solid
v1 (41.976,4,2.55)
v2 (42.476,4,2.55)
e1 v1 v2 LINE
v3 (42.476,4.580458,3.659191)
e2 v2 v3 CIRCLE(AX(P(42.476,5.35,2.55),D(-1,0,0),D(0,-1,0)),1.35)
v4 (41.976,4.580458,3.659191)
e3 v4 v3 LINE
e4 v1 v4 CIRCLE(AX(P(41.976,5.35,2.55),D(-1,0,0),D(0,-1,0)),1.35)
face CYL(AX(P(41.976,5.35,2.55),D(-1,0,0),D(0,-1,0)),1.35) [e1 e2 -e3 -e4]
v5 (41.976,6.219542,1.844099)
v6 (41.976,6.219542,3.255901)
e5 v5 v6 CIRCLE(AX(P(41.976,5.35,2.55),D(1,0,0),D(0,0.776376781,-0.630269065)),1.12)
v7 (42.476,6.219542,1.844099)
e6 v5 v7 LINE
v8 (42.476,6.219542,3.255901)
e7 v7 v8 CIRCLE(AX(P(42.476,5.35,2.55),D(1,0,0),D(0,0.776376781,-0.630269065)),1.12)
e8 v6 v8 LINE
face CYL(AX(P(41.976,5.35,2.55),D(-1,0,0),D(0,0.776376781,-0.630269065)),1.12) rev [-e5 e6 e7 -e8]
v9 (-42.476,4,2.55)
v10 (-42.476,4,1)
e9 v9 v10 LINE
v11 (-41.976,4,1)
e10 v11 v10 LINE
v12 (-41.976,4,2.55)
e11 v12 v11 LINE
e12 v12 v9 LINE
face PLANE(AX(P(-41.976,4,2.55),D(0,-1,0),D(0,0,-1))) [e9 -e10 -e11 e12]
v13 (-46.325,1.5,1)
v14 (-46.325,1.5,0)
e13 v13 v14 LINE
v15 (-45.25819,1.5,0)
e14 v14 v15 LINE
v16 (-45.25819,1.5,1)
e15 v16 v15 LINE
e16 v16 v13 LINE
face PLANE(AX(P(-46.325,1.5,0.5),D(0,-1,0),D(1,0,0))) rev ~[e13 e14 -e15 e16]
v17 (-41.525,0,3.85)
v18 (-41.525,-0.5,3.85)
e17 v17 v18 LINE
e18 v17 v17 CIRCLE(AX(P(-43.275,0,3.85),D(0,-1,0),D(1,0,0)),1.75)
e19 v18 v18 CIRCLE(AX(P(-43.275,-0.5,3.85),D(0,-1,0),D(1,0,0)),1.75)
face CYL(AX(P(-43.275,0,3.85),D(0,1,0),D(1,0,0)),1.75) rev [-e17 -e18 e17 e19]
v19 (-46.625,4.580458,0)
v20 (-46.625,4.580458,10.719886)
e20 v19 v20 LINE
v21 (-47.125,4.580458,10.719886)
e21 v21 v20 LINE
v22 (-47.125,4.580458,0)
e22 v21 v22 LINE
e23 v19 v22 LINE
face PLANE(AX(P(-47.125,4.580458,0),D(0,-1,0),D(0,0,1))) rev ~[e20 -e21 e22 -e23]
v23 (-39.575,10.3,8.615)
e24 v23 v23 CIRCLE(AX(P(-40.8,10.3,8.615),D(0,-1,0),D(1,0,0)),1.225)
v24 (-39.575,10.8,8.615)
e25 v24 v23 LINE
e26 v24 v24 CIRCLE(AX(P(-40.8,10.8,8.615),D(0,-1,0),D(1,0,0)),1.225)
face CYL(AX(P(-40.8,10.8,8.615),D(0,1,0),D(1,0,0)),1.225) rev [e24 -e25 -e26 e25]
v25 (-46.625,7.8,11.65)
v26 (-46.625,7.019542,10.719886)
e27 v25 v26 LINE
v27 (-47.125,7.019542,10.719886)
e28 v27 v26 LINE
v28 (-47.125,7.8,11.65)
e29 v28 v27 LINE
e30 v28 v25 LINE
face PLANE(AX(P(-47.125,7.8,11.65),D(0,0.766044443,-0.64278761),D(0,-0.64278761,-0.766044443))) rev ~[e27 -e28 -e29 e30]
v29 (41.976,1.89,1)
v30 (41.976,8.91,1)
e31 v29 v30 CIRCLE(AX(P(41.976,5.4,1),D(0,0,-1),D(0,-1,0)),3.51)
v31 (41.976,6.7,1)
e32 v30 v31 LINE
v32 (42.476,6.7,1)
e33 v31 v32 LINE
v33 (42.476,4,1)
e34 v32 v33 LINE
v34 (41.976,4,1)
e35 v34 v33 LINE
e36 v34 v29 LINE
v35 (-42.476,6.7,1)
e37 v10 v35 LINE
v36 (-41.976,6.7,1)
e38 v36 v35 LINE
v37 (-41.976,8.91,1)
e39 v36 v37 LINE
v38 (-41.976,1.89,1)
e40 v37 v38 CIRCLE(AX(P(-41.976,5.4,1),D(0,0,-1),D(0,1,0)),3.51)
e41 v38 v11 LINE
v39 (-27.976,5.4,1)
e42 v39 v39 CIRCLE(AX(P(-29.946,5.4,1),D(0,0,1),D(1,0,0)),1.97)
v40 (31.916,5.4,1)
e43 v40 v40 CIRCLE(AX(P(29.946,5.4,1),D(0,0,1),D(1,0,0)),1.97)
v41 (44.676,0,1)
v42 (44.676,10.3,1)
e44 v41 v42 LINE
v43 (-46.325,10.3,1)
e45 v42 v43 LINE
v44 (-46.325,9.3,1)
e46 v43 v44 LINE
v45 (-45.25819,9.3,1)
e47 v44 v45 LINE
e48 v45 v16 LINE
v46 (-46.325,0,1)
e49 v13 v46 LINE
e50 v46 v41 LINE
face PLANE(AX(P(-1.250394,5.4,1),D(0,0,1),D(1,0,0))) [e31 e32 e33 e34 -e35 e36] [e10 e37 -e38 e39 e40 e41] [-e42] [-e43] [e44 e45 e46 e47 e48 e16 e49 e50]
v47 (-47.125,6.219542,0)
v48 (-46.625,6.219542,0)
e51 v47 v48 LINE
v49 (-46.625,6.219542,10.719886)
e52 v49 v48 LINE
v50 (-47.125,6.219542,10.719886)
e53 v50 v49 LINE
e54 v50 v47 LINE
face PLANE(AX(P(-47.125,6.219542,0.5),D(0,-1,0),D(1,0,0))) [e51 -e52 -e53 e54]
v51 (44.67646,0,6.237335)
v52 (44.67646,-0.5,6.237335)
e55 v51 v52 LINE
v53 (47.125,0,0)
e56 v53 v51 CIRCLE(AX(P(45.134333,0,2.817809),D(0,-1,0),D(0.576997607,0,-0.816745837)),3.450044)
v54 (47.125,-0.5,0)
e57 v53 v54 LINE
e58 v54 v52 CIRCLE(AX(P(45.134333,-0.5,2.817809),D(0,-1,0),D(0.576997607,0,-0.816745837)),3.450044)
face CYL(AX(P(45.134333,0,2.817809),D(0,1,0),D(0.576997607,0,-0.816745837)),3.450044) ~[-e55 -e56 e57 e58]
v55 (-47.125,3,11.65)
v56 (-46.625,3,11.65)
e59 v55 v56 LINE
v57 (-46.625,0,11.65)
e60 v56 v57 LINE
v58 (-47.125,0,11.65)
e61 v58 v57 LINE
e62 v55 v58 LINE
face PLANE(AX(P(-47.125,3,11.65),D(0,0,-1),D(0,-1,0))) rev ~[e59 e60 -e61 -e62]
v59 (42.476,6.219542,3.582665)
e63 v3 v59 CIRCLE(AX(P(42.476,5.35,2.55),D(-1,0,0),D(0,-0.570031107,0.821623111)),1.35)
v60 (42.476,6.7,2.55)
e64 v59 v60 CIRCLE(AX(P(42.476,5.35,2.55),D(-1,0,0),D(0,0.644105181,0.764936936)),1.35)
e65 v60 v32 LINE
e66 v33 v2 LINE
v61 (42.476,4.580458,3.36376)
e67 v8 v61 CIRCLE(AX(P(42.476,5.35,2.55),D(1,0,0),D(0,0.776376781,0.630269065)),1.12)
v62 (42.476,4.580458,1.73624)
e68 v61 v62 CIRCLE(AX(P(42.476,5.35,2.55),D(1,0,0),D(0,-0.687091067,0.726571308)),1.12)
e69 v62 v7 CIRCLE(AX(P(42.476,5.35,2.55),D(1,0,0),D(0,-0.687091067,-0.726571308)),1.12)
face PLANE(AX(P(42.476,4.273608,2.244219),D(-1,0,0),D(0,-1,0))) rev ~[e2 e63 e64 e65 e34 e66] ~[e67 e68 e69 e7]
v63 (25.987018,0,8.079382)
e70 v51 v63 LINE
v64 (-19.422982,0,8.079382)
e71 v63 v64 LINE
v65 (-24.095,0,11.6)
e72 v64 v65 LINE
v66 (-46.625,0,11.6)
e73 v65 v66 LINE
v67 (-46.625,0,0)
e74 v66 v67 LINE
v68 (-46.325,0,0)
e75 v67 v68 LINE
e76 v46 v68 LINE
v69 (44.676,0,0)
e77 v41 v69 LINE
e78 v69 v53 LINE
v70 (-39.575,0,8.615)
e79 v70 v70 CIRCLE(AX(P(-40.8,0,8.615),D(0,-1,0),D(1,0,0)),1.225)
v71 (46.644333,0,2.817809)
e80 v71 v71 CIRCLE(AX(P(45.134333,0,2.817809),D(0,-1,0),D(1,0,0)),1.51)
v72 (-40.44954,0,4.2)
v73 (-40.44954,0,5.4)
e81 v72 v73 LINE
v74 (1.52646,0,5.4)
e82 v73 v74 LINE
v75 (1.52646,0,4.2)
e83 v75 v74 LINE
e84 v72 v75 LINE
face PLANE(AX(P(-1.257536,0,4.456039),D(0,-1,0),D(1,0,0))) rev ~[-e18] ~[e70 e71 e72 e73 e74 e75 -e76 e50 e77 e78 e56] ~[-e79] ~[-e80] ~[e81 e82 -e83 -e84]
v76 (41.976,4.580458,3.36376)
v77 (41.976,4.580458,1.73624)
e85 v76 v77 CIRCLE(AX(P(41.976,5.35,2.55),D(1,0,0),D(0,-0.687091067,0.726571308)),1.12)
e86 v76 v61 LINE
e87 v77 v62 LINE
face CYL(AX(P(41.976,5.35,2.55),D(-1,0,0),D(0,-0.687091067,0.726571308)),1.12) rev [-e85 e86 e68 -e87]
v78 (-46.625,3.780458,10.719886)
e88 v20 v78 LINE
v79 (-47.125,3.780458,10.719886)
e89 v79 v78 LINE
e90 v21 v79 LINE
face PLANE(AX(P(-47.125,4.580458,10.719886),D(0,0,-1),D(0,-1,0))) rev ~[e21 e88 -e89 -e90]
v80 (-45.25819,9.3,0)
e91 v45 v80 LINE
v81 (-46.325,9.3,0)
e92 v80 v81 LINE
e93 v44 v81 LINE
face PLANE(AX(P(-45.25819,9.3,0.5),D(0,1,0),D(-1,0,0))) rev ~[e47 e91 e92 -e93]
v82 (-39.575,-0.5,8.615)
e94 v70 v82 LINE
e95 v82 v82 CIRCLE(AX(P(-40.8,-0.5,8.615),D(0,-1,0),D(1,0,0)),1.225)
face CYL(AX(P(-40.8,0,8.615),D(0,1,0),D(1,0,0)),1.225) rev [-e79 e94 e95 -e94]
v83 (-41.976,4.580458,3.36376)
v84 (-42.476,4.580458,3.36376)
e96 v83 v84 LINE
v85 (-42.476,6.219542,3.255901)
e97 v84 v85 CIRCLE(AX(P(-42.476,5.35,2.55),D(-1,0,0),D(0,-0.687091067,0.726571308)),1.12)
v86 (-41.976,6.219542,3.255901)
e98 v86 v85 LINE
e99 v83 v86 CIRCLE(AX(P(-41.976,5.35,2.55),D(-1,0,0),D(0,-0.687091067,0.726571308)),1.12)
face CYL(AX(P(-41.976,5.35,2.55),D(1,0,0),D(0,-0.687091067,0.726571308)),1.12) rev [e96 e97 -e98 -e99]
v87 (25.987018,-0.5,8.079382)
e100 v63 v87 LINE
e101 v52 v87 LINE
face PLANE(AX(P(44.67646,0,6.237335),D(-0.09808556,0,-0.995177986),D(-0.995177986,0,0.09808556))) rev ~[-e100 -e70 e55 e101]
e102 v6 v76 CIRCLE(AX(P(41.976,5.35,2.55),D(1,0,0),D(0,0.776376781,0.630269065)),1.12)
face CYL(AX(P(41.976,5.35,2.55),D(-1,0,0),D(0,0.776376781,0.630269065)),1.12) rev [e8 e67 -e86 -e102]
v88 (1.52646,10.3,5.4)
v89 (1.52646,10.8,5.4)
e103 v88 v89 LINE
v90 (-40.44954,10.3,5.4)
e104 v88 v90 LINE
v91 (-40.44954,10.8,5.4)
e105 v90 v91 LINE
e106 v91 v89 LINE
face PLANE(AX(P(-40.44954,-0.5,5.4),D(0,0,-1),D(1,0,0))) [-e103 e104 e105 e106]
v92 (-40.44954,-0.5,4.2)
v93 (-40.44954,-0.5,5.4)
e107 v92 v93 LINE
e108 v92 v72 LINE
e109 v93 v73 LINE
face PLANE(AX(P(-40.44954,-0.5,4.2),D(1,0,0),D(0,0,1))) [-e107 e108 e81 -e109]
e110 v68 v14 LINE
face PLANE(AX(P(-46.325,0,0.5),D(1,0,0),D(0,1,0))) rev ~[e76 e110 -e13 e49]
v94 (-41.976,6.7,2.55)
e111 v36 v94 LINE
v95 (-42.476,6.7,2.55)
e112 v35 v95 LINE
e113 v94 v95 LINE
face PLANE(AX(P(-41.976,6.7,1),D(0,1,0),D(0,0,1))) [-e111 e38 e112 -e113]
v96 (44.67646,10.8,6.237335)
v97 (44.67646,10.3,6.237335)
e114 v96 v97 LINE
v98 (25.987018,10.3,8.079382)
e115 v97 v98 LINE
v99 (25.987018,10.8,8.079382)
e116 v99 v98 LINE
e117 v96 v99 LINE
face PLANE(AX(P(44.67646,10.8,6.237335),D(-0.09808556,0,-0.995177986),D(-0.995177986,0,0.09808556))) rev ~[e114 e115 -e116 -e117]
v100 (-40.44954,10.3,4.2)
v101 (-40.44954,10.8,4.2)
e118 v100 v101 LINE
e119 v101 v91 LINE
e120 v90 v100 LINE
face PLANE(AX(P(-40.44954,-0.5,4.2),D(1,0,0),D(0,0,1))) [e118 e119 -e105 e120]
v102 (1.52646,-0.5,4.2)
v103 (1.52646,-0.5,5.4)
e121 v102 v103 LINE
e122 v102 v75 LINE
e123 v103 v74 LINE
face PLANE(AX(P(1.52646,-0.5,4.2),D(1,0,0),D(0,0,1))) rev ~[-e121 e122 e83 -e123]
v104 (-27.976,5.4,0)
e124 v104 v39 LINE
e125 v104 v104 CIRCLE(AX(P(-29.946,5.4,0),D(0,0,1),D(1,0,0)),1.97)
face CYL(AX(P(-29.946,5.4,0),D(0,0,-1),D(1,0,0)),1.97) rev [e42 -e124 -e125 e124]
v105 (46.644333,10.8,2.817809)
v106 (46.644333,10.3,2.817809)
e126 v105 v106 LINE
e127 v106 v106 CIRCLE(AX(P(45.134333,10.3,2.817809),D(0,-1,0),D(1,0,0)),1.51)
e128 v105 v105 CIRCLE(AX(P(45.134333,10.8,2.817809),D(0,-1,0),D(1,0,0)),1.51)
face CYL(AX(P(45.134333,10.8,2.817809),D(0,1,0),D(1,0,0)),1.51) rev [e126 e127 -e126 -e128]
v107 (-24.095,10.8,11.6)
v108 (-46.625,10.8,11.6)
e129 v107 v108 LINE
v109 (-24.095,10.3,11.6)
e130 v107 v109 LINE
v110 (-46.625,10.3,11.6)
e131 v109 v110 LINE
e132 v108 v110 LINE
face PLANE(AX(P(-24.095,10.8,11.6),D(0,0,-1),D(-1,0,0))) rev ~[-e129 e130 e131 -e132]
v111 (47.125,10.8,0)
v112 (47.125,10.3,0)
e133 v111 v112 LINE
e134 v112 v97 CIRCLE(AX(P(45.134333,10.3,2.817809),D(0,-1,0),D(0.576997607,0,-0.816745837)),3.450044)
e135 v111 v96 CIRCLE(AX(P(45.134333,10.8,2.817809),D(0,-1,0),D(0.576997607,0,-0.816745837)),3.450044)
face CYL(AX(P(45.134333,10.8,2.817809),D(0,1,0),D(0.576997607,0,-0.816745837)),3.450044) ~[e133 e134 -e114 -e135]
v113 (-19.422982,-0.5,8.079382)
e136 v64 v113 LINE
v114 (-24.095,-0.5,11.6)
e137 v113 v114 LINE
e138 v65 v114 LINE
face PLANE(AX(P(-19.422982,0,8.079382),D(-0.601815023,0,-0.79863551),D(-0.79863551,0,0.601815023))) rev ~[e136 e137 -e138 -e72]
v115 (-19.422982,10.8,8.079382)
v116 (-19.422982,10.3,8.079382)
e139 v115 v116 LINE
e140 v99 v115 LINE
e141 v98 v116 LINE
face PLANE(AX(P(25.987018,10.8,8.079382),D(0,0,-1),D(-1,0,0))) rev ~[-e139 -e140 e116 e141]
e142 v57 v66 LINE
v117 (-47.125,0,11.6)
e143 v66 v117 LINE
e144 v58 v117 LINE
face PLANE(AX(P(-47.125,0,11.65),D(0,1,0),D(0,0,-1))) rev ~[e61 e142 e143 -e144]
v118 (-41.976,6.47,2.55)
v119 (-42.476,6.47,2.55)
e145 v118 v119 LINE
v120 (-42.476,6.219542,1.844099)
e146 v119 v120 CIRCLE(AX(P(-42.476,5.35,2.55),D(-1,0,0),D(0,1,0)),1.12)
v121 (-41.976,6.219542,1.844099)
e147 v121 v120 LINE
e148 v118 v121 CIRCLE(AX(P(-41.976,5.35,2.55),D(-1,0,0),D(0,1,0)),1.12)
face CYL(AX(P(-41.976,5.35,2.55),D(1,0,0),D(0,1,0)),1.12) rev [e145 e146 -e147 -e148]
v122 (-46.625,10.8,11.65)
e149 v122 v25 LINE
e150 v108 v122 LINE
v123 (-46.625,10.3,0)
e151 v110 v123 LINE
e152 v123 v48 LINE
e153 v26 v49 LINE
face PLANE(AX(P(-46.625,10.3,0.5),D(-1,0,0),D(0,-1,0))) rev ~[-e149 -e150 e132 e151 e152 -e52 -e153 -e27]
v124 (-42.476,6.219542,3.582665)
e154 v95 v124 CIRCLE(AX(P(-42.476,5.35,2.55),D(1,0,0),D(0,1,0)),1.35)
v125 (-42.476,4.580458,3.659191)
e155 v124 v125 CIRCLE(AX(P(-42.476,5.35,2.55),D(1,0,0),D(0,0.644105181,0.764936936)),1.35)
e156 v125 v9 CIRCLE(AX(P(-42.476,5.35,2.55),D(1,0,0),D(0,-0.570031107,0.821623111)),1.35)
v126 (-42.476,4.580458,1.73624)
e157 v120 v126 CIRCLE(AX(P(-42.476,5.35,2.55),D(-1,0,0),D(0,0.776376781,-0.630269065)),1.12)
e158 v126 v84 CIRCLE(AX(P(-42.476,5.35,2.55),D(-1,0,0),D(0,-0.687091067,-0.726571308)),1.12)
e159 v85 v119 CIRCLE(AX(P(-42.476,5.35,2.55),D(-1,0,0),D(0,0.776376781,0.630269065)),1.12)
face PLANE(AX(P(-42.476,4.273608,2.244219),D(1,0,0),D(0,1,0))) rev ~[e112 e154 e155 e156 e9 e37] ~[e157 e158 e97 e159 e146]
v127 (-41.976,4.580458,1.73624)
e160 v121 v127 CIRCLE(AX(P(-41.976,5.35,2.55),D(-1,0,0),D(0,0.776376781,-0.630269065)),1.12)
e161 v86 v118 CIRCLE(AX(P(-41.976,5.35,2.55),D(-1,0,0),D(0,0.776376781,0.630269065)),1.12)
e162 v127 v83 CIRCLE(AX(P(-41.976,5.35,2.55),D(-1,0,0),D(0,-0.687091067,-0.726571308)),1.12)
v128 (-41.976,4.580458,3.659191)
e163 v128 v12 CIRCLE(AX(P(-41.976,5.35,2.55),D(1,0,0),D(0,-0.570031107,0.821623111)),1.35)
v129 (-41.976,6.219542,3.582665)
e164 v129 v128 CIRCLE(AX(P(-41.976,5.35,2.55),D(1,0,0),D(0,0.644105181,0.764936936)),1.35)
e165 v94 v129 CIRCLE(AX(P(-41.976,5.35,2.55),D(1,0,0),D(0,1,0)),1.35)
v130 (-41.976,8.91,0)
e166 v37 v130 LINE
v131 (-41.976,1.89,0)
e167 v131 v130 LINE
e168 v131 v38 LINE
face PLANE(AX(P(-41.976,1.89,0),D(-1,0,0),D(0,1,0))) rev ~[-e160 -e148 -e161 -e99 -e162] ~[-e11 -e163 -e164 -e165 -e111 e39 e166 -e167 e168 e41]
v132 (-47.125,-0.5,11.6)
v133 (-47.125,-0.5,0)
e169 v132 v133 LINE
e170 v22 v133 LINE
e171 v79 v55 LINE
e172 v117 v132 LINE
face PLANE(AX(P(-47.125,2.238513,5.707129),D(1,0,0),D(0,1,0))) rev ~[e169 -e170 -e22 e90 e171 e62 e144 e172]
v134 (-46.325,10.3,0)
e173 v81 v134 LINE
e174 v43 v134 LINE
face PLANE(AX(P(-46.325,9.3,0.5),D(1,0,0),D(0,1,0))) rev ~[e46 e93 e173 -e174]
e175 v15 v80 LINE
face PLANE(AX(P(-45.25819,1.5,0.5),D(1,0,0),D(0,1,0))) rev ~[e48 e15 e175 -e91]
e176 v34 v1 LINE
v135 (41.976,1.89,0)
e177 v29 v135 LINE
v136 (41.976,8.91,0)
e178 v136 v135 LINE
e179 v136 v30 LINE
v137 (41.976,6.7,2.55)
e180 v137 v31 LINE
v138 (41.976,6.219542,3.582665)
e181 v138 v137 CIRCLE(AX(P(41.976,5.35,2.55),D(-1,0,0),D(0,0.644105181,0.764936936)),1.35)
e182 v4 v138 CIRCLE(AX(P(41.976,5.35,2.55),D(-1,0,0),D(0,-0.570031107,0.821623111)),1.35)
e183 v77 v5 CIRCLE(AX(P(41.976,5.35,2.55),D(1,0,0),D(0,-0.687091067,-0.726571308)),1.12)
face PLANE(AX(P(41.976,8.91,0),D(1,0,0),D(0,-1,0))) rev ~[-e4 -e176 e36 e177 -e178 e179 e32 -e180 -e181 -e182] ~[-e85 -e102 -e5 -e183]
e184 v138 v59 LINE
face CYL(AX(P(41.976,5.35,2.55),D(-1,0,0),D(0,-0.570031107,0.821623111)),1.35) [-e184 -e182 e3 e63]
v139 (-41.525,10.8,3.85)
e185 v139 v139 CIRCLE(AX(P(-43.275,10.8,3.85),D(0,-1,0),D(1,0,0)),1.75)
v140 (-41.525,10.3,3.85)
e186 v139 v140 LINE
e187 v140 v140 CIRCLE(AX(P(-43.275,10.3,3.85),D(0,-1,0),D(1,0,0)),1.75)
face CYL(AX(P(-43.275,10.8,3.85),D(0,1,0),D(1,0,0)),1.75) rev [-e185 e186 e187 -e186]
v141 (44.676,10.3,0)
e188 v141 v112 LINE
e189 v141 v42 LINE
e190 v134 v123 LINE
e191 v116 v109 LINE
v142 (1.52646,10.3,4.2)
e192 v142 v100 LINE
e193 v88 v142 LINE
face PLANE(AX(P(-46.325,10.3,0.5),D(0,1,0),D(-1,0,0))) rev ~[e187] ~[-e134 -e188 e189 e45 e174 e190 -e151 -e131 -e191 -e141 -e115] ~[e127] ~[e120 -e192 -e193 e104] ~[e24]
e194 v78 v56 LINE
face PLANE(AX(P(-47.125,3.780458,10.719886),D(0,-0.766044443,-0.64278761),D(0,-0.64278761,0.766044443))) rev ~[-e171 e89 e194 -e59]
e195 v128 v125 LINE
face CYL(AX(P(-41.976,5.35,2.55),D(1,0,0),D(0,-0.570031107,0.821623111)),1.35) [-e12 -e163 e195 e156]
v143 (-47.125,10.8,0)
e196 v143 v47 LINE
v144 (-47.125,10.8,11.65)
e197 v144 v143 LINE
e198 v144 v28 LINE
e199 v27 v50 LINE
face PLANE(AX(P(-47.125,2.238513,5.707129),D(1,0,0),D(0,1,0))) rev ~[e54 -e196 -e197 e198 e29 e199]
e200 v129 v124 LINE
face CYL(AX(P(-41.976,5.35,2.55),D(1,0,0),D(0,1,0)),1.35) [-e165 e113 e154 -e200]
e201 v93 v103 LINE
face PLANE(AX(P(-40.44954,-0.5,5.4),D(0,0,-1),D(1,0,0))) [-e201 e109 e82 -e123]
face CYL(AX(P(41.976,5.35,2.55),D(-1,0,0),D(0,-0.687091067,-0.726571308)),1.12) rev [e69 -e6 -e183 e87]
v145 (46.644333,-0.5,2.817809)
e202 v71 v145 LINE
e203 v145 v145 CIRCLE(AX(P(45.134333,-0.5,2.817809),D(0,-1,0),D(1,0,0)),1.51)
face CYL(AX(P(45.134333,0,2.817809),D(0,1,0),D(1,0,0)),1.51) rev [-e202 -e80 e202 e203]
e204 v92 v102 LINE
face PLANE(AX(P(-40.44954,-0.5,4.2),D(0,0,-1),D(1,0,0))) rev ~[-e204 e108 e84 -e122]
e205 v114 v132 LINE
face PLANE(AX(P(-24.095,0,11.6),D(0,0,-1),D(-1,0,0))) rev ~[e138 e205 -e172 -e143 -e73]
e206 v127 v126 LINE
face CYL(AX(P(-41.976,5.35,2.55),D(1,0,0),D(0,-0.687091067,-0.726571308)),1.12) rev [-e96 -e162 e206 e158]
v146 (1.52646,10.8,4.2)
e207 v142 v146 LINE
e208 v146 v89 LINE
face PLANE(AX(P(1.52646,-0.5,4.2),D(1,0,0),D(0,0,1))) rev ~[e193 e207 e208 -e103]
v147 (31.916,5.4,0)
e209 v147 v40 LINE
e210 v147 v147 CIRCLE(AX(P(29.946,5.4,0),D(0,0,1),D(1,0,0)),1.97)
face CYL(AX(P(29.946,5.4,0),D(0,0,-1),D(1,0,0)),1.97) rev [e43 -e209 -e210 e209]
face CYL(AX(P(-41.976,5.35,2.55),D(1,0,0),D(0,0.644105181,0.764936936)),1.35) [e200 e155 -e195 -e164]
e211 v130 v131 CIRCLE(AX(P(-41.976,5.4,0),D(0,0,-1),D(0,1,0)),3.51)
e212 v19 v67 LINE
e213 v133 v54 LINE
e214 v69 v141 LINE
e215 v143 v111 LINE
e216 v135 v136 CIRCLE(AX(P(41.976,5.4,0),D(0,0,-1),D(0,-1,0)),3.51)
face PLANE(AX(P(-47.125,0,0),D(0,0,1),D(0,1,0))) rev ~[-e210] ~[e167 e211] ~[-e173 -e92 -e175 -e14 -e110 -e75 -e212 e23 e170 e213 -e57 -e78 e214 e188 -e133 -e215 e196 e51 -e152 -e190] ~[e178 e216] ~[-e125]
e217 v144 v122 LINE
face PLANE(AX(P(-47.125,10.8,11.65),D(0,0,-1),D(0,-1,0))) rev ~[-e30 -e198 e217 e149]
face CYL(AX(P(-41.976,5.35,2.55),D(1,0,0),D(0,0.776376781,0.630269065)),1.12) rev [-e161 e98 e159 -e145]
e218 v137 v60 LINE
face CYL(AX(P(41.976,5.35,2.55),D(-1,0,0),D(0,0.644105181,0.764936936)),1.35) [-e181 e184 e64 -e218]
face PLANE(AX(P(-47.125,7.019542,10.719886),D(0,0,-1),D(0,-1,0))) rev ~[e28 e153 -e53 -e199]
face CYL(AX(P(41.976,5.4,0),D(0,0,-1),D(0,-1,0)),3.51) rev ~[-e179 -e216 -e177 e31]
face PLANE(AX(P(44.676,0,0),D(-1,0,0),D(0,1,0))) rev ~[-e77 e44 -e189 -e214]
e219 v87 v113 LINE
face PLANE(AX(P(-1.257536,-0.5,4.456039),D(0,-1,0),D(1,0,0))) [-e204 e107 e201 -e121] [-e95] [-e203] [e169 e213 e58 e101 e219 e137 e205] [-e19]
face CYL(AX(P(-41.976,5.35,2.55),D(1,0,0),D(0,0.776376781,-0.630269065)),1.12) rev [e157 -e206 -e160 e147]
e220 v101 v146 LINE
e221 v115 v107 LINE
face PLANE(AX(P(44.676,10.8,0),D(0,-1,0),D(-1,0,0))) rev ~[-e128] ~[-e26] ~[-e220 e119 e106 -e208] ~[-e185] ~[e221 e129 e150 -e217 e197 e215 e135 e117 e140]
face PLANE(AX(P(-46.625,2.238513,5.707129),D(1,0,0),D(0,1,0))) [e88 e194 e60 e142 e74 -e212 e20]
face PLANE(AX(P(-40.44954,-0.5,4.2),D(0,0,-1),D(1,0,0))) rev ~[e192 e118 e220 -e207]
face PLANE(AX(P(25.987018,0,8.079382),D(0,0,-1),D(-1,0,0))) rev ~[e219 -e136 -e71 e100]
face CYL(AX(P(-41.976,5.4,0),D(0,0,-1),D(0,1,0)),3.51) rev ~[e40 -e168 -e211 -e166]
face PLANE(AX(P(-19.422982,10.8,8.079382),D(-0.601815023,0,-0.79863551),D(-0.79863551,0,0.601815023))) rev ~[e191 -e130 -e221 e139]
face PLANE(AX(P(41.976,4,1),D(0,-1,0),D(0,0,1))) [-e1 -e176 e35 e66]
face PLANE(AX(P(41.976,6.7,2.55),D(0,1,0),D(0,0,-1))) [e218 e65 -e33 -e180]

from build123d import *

# Parameters (mm, degrees)
F0_R      = 1.75
F0_R_2    = 1.51
F0_R_3    = 1.225
F8_DEPTH  = 0.5
F2_R      = 1.75
F2_R_2    = 1.51
F2_R_3    = 1.225
F9_DEPTH  = 0.5
F7_R      = 1.97
F10_DEPTH = 0.5
F11_DEPTH = 1
F12_DEPTH = 0.5
F13_DEPTH = 25
F16_DEPTH = 0.5
F17_DEPTH = 0.5
F18_W     = 41.976
F18_H     = 1.2
F19_DEPTH = 11.301


# Not quite as in the source:
# - a feature names something its author has since deleted; it is built from what else it names


with BuildPart() as f8:
    # F0 (on Front) → F8 (new body)
    with BuildSketch(Plane.XZ):
        with BuildLine():
            Line((-24.095, 11.6), (-47.125, 11.6))
            Line((-47.125, 11.6), (-47.125, 0))
            Line((-47.125, 0), (47.125, 0))
            ThreePointArc((47.125, 0), (48.3457892371, 4.0785044966), (44.6764603032, 6.2373353065))
            Line((44.6764603032, 6.2373353065), (25.9870177338, 8.0793821146))
            Line((25.9870177338, 8.0793821146), (-19.4229822662, 8.0793821146))
            Line((-19.4229822662, 8.0793821146), (-24.095, 11.6))
        make_face()
        with Locations((-43.275, 3.85)):
            Circle(F0_R, mode=Mode.SUBTRACT)
        with Locations((45.1343327214, 2.8178092836)):
            Circle(F0_R_2, mode=Mode.SUBTRACT)
        with Locations((-40.8, 8.615)):
            Circle(F0_R_3, mode=Mode.SUBTRACT)
    extrude(amount=F8_DEPTH)

    # F6 (on offset) → F9, piece 2 (join)
    with BuildSketch(Plane.YZ.offset(-47.125)):
        Polygon((3.7804580054, 10.7198863682), (3, 11.65), (0, 11.65), (0, 0), (4.5804580054, 0), (4.5804580054, 10.7198863682), align=None)
    extrude(amount=F9_DEPTH)



with BuildPart() as f8b:
    # F2 (on offset) → F8, piece 2 (new body)
    with BuildSketch(Plane.XZ.offset(-10.8)):
        with BuildLine():
            Line((-19.4229822662, 8.0793821146), (-24.095, 11.6))
            Line((-24.095, 11.6), (-47.125, 11.6))
            Line((-47.125, 11.6), (-47.125, 0))
            Line((-47.125, 0), (47.125, 0))
            ThreePointArc((47.125, 0), (48.3457892371, 4.0785044966), (44.6764603032, 6.2373353065))
            Line((44.6764603032, 6.2373353065), (25.9870177338, 8.0793821146))
            Line((25.9870177338, 8.0793821146), (-19.4229822662, 8.0793821146))
        make_face()
        with Locations((-43.275, 3.85)):
            Circle(F2_R, mode=Mode.SUBTRACT)
        with Locations((45.1343327214, 2.8178092836)):
            Circle(F2_R_2, mode=Mode.SUBTRACT)
        with Locations((-40.8, 8.615)):
            Circle(F2_R_3, mode=Mode.SUBTRACT)
    extrude(amount=F8_DEPTH)

    # F6 (on offset) → F9 (join)
    with BuildSketch(Plane.YZ.offset(-47.125)):
        Polygon((10.8, 0), (10.8, 11.65), (7.8, 11.65), (7.0195419946, 10.7198863682), (6.2195419946, 10.7198863682), (6.2195419946, 0), align=None)
    extrude(amount=F9_DEPTH)


with BuildPart() as f8_1:
    add(f8.part)

    add(f8b.part)  # F10 merges F8b
    # F7 (on Top) → F10 (join)
    with BuildSketch(Plane.XY):
        Polygon((-47.125, 4.45), (-47.125, 0), (-46.325, 0), (-46.325, 1.5), (-45.2581904829, 1.5), (-45.2581904829, 9.3), (-46.325, 9.3), (-46.325, 10.8), (-47.125, 10.8), (-47.125, 5.95), align=None)
        Polygon((-46.325, 1.5), (-46.325, 0), (-24.095, 0), (-19.4229822662, 0), (25.9870177338, 0), (44.676, 0), (44.676, 10.8), (25.9870177338, 10.8), (-19.4229822662, 10.8), (-46.325, 10.8), (-46.325, 9.3), (-45.2581904829, 9.3), (-45.2581904829, 1.5), align=None)
        with BuildLine():
            Line((-41.976, 1.89), (-41.976, 8.91))
            ThreePointArc((-41.976, 8.91), (-38.466, 5.4), (-41.976, 1.89))
        make_face(mode=Mode.SUBTRACT)
        with Locations((-29.946, 5.4)):
            Circle(F7_R, mode=Mode.SUBTRACT)
        with Locations((29.946, 5.4)):
            Circle(F7_R, mode=Mode.SUBTRACT)
        with BuildLine():
            Line((41.976, 8.91), (41.976, 1.89))
            ThreePointArc((41.976, 1.89), (38.466, 5.4), (41.976, 8.91))
        make_face(mode=Mode.SUBTRACT)
    extrude(amount=F10_DEPTH)

    # F7 (on Top) → F11 (join)
    with BuildSketch(Plane.XY):
        Polygon((-46.325, 1.5), (-46.325, 0), (-24.095, 0), (-19.4229822662, 0), (25.9870177338, 0), (44.676, 0), (44.676, 10.8), (25.9870177338, 10.8), (-19.4229822662, 10.8), (-46.325, 10.8), (-46.325, 9.3), (-45.2581904829, 9.3), (-45.2581904829, 1.5), align=None)
        with BuildLine():
            Line((-41.976, 1.89), (-41.976, 8.91))
            ThreePointArc((-41.976, 8.91), (-38.466, 5.4), (-41.976, 1.89))
        make_face(mode=Mode.SUBTRACT)
        with Locations((-29.946, 5.4)):
            Circle(F7_R, mode=Mode.SUBTRACT)
        with Locations((29.946, 5.4)):
            Circle(F7_R, mode=Mode.SUBTRACT)
        with BuildLine():
            Line((41.976, 8.91), (41.976, 1.89))
            ThreePointArc((41.976, 1.89), (38.466, 5.4), (41.976, 8.91))
        make_face(mode=Mode.SUBTRACT)
    extrude(amount=F11_DEPTH)

    # F6 (on offset) → F12 (join)
    with BuildSketch(Plane.YZ.offset(-47.125)):
        Polygon((3.7804580054, 10.7198863682), (3, 11.65), (0, 11.65), (0, 0), (4.5804580054, 0), (4.5804580054, 10.7198863682), align=None)
    extrude(amount=F12_DEPTH)

    # F13 (cut): a face of the model
    f13_faces = [f8_1.faces().sort_by_distance(p)[0] for p in [
        (-46.0368491628, 5.3368390391, 0.5),
    ]]
    extrude(f13_faces, amount=-F13_DEPTH, mode=Mode.SUBTRACT)

    # F14 (on face) → F16 (join)
    with BuildSketch(Plane.YZ.offset(-41.976)):
        with BuildLine():
            Line((4, 2.55), (4, 1))
            Line((4, 1), (4.5804580054, 1))
            Line((4.5804580054, 1), (4.5804580054, 1.7362401346))
            ThreePointArc((4.5804580054, 1.7362401346), (4.23, 2.55), (4.5804580054, 3.3637598654))
            Line((4.5804580054, 3.3637598654), (4.5804580054, 3.6591912001))
            ThreePointArc((4.5804580054, 3.6591912001), (4.1538851032, 3.175946606), (4, 2.55))
        make_face()
        with BuildLine():
            ThreePointArc((6.2195419946, 3.5826648631), (5.4129608614, 3.8985310267), (4.5804580054, 3.6591912001))
            Line((4.5804580054, 3.6591912001), (4.5804580054, 3.3637598654))
            ThreePointArc((4.5804580054, 3.3637598654), (5.4235415848, 3.6675829434), (6.2195419946, 3.2559013526))
            Line((6.2195419946, 3.2559013526), (6.2195419946, 3.5826648631))
        make_face()
        with BuildLine():
            Line((4.5804580054, 1.7362401346), (4.5804580054, 1))
            Line((4.5804580054, 1), (6.2195419946, 1))
            Line((6.2195419946, 1), (6.2195419946, 1.8440986474))
            ThreePointArc((6.2195419946, 1.8440986474), (5.4235415848, 1.4324170566), (4.5804580054, 1.7362401346))
        make_face()
        with BuildLine():
            Line((6.2195419946, 1.8440986474), (6.2195419946, 1))
            Line((6.2195419946, 1), (6.7, 1))
            Line((6.7, 1), (6.7, 2.55))
            ThreePointArc((6.7, 2.55), (6.5740060647, 3.1194814779), (6.2195419946, 3.5826648631))
            Line((6.2195419946, 3.5826648631), (6.2195419946, 3.2559013526))
            ThreePointArc((6.2195419946, 3.2559013526), (6.4055299697, 2.9245083217), (6.47, 2.55))
            ThreePointArc((6.47, 2.55), (6.4055299697, 2.1754916783), (6.2195419946, 1.8440986474))
        make_face()
    extrude(amount=-F16_DEPTH)

    # F15 (on face) → F17 (join)
    with BuildSketch(Plane(origin=(41.976, 0, 0), x_dir=(0, -1, 0), z_dir=(-1, 0, 0))):
        with BuildLine():
            ThreePointArc((-4.5804580054, 3.3637598654), (-4.23, 2.55), (-4.5804580054, 1.7362401346))
            Line((-4.5804580054, 1.7362401346), (-4.5804580054, 1))
            Line((-4.5804580054, 1), (-4, 1))
            Line((-4, 1), (-4, 2.55))
            ThreePointArc((-4, 2.55), (-4.1538851032, 3.175946606), (-4.5804580054, 3.6591912001))
            Line((-4.5804580054, 3.6591912001), (-4.5804580054, 3.3637598654))
        make_face()
        with BuildLine():
            Line((-6.2195419946, 3.5826648631), (-6.2195419946, 3.2559013526))
            ThreePointArc((-6.2195419946, 3.2559013526), (-5.4235415848, 3.6675829434), (-4.5804580054, 3.3637598654))
            Line((-4.5804580054, 3.3637598654), (-4.5804580054, 3.6591912001))
            ThreePointArc((-4.5804580054, 3.6591912001), (-5.4129608614, 3.8985310267), (-6.2195419946, 3.5826648631))
        make_face()
        with BuildLine():
            Line((-6.2195419946, 1), (-6.2195419946, 1.8440986474))
            ThreePointArc((-6.2195419946, 1.8440986474), (-6.47, 2.55), (-6.2195419946, 3.2559013526))
            Line((-6.2195419946, 3.2559013526), (-6.2195419946, 3.5826648631))
            ThreePointArc((-6.2195419946, 3.5826648631), (-6.5740060647, 3.1194814779), (-6.7, 2.55))
            Line((-6.7, 2.55), (-6.7, 1))
            Line((-6.7, 1), (-6.2195419946, 1))
        make_face()
        with BuildLine():
            ThreePointArc((-4.5804580054, 1.7362401346), (-5.4235415848, 1.4324170566), (-6.2195419946, 1.8440986474))
            Line((-6.2195419946, 1.8440986474), (-6.2195419946, 1))
            Line((-6.2195419946, 1), (-4.5804580054, 1))
            Line((-4.5804580054, 1), (-4.5804580054, 1.7362401346))
        make_face()
    extrude(amount=-F17_DEPTH)

    # F18 (on face) → F19 (cut, through all)
    with BuildSketch(Plane.XZ.offset(0.5)):
        with Locations((-19.4615396968, 4.8)):
            Rectangle(F18_W, F18_H)
    extrude(amount=-F19_DEPTH, mode=Mode.SUBTRACT)


solid = f8_1.part
